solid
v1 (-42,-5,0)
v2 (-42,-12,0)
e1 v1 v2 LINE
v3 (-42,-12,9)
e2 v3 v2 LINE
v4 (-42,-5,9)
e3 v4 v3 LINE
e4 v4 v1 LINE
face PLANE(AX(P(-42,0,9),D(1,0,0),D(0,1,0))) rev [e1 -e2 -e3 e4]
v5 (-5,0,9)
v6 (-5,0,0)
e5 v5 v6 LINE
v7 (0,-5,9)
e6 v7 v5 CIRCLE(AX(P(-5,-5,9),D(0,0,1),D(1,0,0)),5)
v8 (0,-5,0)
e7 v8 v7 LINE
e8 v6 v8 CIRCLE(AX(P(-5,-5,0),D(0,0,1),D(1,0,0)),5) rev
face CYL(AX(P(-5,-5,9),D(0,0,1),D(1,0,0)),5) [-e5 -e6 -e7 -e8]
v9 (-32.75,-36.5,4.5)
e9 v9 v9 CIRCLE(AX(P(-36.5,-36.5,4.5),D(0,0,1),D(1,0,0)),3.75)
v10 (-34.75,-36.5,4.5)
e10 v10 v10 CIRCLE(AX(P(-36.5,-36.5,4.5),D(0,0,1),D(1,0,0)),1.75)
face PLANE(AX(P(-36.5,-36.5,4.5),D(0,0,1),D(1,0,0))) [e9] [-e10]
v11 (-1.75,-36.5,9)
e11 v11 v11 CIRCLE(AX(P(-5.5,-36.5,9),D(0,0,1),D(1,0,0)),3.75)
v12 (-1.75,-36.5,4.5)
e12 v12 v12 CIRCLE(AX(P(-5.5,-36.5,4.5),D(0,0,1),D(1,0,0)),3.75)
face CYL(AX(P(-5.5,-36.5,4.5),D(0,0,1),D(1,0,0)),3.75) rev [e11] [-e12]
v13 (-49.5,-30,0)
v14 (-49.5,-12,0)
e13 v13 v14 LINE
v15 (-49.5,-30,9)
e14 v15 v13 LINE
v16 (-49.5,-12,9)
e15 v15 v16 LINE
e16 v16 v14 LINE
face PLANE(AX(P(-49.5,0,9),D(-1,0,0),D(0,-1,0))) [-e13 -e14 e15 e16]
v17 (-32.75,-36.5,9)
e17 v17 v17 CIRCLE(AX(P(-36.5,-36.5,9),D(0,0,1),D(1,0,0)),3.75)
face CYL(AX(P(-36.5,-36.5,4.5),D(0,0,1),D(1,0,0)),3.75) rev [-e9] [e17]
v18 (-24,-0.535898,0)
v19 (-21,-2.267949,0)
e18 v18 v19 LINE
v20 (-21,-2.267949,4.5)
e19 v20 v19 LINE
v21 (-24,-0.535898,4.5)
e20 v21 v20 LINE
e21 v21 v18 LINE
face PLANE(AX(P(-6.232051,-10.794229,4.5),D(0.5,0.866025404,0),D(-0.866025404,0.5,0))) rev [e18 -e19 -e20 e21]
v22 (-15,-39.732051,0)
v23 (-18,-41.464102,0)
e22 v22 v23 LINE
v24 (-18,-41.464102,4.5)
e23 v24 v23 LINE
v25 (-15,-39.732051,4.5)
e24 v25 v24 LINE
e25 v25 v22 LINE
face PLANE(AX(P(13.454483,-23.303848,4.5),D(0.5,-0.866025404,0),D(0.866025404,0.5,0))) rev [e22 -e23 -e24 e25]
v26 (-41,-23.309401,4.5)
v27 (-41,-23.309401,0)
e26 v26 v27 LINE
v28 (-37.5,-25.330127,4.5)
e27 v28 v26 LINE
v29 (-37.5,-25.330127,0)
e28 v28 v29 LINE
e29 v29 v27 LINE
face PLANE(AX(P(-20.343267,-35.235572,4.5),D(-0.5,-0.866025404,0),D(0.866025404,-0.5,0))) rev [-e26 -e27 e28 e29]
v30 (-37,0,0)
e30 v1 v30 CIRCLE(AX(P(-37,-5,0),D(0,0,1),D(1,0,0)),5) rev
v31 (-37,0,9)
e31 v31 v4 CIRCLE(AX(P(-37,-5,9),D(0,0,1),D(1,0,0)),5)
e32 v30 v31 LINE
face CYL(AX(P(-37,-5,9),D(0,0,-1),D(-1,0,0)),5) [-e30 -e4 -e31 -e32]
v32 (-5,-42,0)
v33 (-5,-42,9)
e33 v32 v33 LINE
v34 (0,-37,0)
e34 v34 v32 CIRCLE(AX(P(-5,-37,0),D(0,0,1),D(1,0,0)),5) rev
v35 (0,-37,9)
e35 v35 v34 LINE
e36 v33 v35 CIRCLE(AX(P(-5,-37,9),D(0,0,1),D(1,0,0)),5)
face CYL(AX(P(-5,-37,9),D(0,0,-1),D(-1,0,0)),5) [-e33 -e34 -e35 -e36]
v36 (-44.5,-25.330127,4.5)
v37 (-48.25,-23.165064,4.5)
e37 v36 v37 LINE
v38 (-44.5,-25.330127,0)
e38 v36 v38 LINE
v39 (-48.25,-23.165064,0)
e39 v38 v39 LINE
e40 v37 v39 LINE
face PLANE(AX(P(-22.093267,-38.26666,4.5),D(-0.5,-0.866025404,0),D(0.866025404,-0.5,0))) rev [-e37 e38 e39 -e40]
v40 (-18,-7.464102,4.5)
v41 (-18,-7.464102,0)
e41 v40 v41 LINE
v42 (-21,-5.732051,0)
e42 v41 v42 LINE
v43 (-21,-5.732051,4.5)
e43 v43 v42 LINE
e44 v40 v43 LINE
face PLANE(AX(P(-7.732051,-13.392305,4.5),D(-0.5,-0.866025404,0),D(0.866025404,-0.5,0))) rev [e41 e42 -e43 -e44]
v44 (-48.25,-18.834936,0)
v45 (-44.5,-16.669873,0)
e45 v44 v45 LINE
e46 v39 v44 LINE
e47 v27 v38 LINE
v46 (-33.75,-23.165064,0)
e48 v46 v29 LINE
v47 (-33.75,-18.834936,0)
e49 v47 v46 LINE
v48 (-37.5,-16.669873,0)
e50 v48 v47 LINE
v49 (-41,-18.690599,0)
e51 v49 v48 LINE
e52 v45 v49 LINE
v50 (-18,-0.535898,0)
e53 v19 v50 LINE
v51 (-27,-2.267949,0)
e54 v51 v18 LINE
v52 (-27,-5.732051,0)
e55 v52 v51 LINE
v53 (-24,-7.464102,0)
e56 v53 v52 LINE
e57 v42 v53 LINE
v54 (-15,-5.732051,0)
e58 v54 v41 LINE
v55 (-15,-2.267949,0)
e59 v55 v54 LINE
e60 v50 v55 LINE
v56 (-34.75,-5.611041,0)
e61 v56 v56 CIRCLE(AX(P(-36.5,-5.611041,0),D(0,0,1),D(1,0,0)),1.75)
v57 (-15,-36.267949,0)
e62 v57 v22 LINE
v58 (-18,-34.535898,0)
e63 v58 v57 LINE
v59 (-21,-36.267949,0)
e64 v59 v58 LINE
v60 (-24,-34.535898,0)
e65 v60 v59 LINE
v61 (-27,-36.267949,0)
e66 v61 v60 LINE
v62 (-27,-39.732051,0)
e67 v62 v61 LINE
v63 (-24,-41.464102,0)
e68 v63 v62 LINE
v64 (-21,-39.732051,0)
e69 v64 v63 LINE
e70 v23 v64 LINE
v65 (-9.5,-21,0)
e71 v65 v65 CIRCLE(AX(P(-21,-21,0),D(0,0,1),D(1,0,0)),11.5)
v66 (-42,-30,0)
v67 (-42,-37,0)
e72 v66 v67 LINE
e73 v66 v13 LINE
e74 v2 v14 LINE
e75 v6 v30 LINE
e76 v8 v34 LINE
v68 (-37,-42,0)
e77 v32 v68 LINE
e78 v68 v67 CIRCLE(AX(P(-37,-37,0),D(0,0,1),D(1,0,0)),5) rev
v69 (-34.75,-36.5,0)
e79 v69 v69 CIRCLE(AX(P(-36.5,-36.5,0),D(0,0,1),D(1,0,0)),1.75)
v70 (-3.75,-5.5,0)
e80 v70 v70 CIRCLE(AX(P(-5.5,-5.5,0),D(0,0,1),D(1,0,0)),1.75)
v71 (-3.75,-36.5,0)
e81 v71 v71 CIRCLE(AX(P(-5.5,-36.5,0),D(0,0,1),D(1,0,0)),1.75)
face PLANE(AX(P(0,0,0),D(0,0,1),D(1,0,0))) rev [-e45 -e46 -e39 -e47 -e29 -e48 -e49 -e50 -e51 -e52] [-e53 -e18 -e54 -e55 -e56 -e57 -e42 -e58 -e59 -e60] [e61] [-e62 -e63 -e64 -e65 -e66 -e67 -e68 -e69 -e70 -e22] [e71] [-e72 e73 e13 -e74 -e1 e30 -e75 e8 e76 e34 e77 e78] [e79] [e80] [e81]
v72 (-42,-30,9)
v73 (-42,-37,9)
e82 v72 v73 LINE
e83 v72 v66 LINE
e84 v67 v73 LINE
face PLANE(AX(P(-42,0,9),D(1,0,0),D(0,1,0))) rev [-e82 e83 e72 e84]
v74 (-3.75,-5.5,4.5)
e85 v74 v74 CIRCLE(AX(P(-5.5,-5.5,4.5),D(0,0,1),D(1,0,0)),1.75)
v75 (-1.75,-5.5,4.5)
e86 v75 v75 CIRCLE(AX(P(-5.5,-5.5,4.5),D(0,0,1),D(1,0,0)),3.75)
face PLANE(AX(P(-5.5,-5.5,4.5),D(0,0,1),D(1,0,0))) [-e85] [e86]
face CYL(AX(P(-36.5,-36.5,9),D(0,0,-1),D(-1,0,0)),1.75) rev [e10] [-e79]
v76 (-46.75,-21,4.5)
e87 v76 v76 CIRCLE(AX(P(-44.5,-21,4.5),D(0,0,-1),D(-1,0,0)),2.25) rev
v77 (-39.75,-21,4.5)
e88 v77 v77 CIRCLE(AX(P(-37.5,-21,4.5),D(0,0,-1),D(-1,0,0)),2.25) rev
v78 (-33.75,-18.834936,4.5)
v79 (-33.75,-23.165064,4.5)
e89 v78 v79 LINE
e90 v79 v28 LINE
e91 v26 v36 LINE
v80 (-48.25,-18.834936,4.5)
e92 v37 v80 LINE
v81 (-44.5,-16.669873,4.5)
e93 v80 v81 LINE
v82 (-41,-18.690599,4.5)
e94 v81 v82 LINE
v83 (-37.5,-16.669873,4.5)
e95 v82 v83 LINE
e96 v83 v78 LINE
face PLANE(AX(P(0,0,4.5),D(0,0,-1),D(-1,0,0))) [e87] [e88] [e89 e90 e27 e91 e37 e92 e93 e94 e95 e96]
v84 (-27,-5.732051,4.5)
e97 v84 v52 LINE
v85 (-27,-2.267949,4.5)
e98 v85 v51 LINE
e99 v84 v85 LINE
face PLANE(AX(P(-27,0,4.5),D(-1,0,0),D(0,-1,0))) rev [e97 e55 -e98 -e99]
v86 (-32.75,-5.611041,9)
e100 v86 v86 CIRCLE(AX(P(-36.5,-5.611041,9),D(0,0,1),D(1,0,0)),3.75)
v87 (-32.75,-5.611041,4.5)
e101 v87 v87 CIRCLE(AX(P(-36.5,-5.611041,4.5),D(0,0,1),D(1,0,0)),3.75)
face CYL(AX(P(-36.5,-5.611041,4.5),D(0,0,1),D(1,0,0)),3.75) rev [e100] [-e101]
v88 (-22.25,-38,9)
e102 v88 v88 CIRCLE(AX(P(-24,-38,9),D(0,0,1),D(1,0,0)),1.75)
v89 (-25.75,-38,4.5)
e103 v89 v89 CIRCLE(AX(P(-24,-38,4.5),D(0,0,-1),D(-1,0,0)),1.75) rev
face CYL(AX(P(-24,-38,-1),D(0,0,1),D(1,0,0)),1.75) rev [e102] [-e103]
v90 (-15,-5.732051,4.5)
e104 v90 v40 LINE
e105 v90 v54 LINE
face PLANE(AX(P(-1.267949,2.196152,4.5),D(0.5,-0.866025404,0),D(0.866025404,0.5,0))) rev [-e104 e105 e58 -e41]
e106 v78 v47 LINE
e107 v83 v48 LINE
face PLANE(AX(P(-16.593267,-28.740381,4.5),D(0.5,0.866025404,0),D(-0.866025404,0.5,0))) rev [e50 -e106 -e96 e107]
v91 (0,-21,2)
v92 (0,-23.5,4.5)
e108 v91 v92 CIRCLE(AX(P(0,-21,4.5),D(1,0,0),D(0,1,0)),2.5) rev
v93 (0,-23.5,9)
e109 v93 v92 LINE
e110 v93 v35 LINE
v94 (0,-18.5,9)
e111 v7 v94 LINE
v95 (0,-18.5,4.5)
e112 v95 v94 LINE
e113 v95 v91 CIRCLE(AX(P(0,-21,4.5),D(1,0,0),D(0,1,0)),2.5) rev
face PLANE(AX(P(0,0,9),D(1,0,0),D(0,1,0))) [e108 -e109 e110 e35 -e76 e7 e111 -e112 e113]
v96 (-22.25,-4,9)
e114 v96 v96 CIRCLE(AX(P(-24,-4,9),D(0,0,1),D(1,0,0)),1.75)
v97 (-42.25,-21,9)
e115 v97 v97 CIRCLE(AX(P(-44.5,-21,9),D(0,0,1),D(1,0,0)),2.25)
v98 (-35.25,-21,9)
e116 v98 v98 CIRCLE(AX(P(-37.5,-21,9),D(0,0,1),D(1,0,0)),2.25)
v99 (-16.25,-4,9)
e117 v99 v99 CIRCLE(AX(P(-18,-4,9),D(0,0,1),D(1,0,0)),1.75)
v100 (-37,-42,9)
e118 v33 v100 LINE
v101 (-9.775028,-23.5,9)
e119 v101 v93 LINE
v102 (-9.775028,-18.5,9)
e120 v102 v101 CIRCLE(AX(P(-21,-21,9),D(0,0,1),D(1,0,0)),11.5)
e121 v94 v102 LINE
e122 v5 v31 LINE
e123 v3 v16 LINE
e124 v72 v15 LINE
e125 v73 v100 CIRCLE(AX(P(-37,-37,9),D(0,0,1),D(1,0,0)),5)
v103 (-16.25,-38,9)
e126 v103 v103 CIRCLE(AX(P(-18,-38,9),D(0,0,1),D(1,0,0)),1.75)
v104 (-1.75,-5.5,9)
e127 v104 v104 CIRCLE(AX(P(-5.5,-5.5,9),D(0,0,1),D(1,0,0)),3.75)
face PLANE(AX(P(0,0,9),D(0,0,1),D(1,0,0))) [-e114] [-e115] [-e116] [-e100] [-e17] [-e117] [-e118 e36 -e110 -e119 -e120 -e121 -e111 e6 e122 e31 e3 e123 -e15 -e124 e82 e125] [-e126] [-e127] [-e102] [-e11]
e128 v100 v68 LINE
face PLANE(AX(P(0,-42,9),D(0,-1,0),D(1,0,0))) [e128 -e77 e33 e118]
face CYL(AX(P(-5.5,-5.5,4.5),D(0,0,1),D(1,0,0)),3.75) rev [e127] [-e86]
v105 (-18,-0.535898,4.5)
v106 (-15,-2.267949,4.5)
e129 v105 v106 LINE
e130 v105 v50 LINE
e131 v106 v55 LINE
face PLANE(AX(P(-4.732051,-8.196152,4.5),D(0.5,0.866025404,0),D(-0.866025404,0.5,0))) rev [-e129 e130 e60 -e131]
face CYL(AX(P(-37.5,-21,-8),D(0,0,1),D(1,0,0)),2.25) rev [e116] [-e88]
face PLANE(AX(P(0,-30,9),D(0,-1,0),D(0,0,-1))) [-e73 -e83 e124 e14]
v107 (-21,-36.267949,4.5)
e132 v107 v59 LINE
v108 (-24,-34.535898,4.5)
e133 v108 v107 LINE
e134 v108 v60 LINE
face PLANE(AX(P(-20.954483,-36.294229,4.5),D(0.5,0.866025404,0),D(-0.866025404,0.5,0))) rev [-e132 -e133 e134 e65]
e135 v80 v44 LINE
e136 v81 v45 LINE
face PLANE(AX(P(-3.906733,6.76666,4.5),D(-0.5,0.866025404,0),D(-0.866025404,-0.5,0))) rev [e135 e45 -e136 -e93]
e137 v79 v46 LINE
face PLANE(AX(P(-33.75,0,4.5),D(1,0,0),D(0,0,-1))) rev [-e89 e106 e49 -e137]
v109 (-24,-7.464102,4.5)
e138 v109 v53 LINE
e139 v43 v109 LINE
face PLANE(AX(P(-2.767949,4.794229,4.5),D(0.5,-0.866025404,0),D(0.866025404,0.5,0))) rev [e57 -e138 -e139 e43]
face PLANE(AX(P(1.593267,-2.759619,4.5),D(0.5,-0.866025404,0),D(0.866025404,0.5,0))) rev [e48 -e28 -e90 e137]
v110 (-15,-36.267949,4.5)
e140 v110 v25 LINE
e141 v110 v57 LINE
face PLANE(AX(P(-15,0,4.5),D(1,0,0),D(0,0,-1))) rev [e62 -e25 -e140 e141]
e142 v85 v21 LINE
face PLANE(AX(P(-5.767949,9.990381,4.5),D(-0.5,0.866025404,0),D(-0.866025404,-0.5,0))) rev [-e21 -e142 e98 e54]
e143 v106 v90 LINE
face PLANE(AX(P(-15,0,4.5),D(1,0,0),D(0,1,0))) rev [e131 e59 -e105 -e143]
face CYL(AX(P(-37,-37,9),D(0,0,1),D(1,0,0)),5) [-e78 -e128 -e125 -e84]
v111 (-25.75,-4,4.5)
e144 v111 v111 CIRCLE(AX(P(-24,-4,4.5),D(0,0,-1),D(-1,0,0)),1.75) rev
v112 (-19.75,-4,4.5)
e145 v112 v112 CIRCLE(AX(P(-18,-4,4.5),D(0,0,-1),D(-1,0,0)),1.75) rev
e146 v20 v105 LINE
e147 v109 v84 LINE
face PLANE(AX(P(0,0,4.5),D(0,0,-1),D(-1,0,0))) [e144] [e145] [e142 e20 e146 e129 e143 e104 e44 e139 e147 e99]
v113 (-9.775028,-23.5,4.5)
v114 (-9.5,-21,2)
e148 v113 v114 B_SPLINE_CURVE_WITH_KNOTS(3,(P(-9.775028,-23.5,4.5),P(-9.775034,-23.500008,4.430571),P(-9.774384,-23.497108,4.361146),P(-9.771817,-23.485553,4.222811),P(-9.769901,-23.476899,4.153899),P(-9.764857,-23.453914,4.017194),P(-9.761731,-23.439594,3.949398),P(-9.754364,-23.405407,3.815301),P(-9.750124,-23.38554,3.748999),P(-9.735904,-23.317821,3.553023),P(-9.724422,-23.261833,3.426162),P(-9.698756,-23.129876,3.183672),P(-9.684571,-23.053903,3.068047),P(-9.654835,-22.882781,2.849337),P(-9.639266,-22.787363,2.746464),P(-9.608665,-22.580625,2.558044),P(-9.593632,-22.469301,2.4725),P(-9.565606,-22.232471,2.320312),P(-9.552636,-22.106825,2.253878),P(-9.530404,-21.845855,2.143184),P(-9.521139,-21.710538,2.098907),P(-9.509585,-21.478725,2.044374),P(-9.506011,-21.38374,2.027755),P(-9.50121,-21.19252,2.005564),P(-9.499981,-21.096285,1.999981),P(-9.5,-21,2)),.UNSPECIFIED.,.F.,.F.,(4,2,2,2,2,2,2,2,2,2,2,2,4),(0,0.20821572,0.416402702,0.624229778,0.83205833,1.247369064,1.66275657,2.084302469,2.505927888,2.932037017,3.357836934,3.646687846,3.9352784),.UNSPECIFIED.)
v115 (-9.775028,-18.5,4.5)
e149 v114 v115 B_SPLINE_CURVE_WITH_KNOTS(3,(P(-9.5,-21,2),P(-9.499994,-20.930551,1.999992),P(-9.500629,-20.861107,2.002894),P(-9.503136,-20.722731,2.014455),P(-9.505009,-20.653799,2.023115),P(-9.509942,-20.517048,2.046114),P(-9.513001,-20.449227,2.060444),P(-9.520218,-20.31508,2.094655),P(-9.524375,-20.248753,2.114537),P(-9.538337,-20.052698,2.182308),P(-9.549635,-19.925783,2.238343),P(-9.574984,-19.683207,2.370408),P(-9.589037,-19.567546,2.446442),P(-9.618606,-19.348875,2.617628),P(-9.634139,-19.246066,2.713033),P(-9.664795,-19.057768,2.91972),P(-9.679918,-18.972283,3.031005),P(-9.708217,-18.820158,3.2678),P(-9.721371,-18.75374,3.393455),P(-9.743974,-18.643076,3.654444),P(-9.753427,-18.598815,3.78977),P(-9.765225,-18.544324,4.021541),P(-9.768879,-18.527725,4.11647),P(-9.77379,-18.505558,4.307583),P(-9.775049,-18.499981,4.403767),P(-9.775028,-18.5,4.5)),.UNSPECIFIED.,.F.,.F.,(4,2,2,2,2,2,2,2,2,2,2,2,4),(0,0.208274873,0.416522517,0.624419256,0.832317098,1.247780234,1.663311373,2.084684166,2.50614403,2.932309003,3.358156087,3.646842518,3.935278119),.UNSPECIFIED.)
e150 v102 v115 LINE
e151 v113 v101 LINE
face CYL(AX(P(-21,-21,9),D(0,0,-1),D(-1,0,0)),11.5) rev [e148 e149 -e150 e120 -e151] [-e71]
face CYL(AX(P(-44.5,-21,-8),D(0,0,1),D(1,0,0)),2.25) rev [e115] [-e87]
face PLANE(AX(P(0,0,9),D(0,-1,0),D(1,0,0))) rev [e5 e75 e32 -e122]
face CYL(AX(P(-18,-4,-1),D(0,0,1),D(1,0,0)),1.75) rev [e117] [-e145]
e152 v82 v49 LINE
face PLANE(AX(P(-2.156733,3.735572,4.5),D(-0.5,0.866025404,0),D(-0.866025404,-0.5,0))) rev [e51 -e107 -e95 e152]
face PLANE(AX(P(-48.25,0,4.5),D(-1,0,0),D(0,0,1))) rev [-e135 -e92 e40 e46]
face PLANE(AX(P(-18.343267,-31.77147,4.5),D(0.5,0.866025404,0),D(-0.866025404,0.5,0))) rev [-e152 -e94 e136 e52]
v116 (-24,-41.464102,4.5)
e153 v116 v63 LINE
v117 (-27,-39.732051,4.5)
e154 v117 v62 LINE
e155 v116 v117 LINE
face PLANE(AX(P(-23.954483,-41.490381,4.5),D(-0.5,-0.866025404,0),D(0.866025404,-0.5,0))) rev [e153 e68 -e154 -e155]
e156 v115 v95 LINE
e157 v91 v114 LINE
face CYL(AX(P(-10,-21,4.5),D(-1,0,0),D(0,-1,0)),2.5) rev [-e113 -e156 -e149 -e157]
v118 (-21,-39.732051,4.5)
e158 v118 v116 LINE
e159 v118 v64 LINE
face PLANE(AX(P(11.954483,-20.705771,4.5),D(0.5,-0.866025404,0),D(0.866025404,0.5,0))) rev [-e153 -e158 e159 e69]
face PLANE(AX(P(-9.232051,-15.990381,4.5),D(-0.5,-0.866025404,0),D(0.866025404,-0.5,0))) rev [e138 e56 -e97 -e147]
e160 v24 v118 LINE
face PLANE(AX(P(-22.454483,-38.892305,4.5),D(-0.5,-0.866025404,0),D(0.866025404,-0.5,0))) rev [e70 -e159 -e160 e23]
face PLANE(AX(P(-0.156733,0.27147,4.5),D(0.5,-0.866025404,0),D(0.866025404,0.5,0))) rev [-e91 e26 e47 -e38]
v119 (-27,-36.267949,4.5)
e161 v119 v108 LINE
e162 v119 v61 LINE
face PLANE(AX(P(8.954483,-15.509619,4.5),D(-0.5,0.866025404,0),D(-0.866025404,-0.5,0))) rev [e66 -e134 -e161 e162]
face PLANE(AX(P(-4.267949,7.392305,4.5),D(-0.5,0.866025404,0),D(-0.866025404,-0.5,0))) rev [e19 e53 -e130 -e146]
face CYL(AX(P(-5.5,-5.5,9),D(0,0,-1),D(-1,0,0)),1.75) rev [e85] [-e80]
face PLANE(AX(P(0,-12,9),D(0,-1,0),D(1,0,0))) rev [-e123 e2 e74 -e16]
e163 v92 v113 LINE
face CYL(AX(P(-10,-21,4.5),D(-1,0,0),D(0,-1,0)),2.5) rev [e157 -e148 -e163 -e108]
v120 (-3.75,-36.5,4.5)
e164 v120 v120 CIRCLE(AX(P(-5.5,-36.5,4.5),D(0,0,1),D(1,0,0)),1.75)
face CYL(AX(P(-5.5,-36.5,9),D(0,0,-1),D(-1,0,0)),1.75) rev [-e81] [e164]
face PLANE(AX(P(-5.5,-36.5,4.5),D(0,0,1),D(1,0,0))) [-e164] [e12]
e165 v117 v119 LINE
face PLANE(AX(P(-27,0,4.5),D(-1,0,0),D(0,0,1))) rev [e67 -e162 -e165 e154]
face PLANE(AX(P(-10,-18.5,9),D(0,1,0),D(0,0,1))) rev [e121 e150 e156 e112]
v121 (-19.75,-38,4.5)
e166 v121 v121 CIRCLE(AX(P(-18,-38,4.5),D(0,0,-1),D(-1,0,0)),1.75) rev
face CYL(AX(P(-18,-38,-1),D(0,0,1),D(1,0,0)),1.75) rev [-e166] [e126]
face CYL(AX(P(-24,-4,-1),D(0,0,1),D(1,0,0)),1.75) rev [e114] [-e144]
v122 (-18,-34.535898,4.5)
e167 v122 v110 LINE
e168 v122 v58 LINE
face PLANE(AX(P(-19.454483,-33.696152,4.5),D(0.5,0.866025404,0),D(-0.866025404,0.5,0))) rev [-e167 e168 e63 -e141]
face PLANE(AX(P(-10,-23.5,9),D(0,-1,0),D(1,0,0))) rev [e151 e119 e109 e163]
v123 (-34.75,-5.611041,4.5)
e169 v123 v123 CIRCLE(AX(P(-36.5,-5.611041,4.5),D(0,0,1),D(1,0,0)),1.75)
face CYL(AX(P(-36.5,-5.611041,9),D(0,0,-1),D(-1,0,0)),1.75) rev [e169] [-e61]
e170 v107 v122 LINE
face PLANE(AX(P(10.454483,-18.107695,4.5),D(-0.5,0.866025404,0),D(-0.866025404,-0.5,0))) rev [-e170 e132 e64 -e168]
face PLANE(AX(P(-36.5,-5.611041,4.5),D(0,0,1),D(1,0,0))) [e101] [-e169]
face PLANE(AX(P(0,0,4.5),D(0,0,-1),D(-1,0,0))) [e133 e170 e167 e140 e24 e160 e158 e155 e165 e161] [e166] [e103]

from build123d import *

# Parameters (mm, degrees)
ESQUISSE1_W             = 42
ESQUISSE1_H             = 42
ESQUISSE1_R             = 11.5
ESQUISSE1_R_2           = 1.75
ESQUISSE1_W_2           = 7.5
ESQUISSE1_H_2           = 18
BOSS_EXTRU_1_DEPTH      = 9
ESQUISSE9_R             = 2.25
ENL_V_MAT_EXTRU_2_DEPTH = 17
ENL_V_MAT_EXTRU_3_DEPTH = 4.5
ESQUISSE11_R            = 3.75
ENL_V_MAT_EXTRU_4_DEPTH = 4.5
CONG_1_R                = 5
ESQUISSE12_R            = 1.75
ENL_V_MAT_EXTRU_5_DEPTH = 10
ENL_V_MAT_EXTRU_8_DEPTH = 4.5
ESQUISSE15_W            = 7
ESQUISSE15_H            = 5
ENL_V_MAT_EXTRU_9_DEPTH = 10
CONG_2_R                = 2.5


with BuildPart() as part:
    # Esquisse1 → Boss.-Extru.1 (new body)
    # profile 1 of 2: a face of its own
    with BuildSketch(Plane.XY):
        with Locations((-21, -21)):
            Rectangle(ESQUISSE1_W, ESQUISSE1_H)
        with Locations((-21, -21)):
            Circle(ESQUISSE1_R, mode=Mode.SUBTRACT)
        with Locations((-36.5, -36.5)):
            Circle(ESQUISSE1_R_2, mode=Mode.SUBTRACT)
        with Locations((-5.5, -36.5)):
            Circle(ESQUISSE1_R_2, mode=Mode.SUBTRACT)
        with Locations((-5.5, -5.5)):
            Circle(ESQUISSE1_R_2, mode=Mode.SUBTRACT)
        with Locations((-36.5, -5.611040912)):
            Circle(ESQUISSE1_R_2, mode=Mode.SUBTRACT)
    # profile 2 of 2: a face of its own
    with BuildSketch(Plane.XY):
        with Locations((-45.75, -21)):
            Rectangle(ESQUISSE1_W_2, ESQUISSE1_H_2)
    extrude(amount=BOSS_EXTRU_1_DEPTH)

    # Esquisse9 → Enlèv. mat.-Extru.2 (cut)
    with BuildSketch(Plane.XY.offset(9)):
        with Locations((-44.5, -21)):
            Circle(ESQUISSE9_R)
        with Locations((-37.5, -21)):
            Circle(ESQUISSE9_R)
    extrude(amount=-ENL_V_MAT_EXTRU_2_DEPTH, mode=Mode.SUBTRACT)

    # Esquisse10 → Enlèv. mat.-Extru.3 (cut)
    with BuildSketch(Plane(origin=(0, 0, 0), x_dir=(-1, 0, 0), z_dir=(0, 0, -1))):
        Polygon((44.5, -25.330127019), (48.25, -23.165063509), (48.25, -18.834936491), (44.5, -16.669872981), (40.75, -18.834936491), (40.75, -23.165063509), align=None)
        Polygon((37.5, -25.330127019), (41.25, -23.165063509), (41.25, -18.834936491), (37.5, -16.669872981), (33.75, -18.834936491), (33.75, -23.165063509), align=None)
    extrude(amount=-ENL_V_MAT_EXTRU_3_DEPTH, mode=Mode.SUBTRACT)

    # Esquisse11 → Enlèv. mat.-Extru.4 (cut)
    with BuildSketch(Plane.XY.offset(9)):
        with Locations((-36.5, -5.611040912)):
            Circle(ESQUISSE11_R)
        with Locations((-5.5, -5.5)):
            Circle(ESQUISSE11_R)
        with Locations((-5.5, -36.5)):
            Circle(ESQUISSE11_R)
        with Locations((-36.5, -36.5)):
            Circle(ESQUISSE11_R)
    extrude(amount=-ENL_V_MAT_EXTRU_4_DEPTH, mode=Mode.SUBTRACT)

    # Congé1
    cong_1_edges = [part.edges().sort_by_distance(p)[0] for p in [
        (0, 0, 4.5),
        (0, -42, 4.5),
        (-42, -42, 4.5),
        (-42, 0, 4.5),
    ]]
    fillet(cong_1_edges, radius=CONG_1_R)

    # Esquisse12 → Enlèv. mat.-Extru.5 (cut)
    with BuildSketch(Plane.XY.offset(9)):
        with Locations((-24, -38)):
            Circle(ESQUISSE12_R)
        with Locations((-18, -38)):
            Circle(ESQUISSE12_R)
        with Locations((-24, -4)):
            Circle(ESQUISSE12_R)
        with Locations((-18, -4)):
            Circle(ESQUISSE12_R)
    extrude(amount=-ENL_V_MAT_EXTRU_5_DEPTH, mode=Mode.SUBTRACT)

    # Esquisse14 → Enlèv. mat.-Extru.8 (cut)
    with BuildSketch(Plane(origin=(0, 0, 0), x_dir=(-1, 0, 0), z_dir=(0, 0, -1))):
        Polygon((27, -39.732050808), (27, -36.267949192), (24, -34.535898385), (21, -36.267949192), (18, -34.535898385), (15, -36.267949192), (15, -39.732050808), (18, -41.464101615), (21, -39.732050808), (24, -41.464101615), align=None)
        Polygon((27, -5.732050808), (27, -2.267949192), (24, -0.535898385), (21, -2.267949192), (18, -0.535898385), (15, -2.267949192), (15, -5.732050808), (18, -7.464101615), (21, -5.732050808), (24, -7.464101615), align=None)
    extrude(amount=-ENL_V_MAT_EXTRU_8_DEPTH, mode=Mode.SUBTRACT)

    # Esquisse15 → Enlèv. mat.-Extru.9 (cut)
    with BuildSketch(Plane(origin=(0, 0, 0), x_dir=(0, 0, -1), z_dir=(1, 0, 0))):
        with Locations((-5.5, -21)):
            Rectangle(ESQUISSE15_W, ESQUISSE15_H)
    extrude(amount=-ENL_V_MAT_EXTRU_9_DEPTH, mode=Mode.SUBTRACT)

    # Congé2
    cong_2_edges = [part.edges().sort_by_distance(p)[0] for p in [
        (-4.88751392, -23.5, 2),
        (-4.88751392, -18.5, 2),
    ]]
    fillet(cong_2_edges, radius=CONG_2_R - 0.0001)  # a hair under: the kernel refuses the full size


solid = part.part
